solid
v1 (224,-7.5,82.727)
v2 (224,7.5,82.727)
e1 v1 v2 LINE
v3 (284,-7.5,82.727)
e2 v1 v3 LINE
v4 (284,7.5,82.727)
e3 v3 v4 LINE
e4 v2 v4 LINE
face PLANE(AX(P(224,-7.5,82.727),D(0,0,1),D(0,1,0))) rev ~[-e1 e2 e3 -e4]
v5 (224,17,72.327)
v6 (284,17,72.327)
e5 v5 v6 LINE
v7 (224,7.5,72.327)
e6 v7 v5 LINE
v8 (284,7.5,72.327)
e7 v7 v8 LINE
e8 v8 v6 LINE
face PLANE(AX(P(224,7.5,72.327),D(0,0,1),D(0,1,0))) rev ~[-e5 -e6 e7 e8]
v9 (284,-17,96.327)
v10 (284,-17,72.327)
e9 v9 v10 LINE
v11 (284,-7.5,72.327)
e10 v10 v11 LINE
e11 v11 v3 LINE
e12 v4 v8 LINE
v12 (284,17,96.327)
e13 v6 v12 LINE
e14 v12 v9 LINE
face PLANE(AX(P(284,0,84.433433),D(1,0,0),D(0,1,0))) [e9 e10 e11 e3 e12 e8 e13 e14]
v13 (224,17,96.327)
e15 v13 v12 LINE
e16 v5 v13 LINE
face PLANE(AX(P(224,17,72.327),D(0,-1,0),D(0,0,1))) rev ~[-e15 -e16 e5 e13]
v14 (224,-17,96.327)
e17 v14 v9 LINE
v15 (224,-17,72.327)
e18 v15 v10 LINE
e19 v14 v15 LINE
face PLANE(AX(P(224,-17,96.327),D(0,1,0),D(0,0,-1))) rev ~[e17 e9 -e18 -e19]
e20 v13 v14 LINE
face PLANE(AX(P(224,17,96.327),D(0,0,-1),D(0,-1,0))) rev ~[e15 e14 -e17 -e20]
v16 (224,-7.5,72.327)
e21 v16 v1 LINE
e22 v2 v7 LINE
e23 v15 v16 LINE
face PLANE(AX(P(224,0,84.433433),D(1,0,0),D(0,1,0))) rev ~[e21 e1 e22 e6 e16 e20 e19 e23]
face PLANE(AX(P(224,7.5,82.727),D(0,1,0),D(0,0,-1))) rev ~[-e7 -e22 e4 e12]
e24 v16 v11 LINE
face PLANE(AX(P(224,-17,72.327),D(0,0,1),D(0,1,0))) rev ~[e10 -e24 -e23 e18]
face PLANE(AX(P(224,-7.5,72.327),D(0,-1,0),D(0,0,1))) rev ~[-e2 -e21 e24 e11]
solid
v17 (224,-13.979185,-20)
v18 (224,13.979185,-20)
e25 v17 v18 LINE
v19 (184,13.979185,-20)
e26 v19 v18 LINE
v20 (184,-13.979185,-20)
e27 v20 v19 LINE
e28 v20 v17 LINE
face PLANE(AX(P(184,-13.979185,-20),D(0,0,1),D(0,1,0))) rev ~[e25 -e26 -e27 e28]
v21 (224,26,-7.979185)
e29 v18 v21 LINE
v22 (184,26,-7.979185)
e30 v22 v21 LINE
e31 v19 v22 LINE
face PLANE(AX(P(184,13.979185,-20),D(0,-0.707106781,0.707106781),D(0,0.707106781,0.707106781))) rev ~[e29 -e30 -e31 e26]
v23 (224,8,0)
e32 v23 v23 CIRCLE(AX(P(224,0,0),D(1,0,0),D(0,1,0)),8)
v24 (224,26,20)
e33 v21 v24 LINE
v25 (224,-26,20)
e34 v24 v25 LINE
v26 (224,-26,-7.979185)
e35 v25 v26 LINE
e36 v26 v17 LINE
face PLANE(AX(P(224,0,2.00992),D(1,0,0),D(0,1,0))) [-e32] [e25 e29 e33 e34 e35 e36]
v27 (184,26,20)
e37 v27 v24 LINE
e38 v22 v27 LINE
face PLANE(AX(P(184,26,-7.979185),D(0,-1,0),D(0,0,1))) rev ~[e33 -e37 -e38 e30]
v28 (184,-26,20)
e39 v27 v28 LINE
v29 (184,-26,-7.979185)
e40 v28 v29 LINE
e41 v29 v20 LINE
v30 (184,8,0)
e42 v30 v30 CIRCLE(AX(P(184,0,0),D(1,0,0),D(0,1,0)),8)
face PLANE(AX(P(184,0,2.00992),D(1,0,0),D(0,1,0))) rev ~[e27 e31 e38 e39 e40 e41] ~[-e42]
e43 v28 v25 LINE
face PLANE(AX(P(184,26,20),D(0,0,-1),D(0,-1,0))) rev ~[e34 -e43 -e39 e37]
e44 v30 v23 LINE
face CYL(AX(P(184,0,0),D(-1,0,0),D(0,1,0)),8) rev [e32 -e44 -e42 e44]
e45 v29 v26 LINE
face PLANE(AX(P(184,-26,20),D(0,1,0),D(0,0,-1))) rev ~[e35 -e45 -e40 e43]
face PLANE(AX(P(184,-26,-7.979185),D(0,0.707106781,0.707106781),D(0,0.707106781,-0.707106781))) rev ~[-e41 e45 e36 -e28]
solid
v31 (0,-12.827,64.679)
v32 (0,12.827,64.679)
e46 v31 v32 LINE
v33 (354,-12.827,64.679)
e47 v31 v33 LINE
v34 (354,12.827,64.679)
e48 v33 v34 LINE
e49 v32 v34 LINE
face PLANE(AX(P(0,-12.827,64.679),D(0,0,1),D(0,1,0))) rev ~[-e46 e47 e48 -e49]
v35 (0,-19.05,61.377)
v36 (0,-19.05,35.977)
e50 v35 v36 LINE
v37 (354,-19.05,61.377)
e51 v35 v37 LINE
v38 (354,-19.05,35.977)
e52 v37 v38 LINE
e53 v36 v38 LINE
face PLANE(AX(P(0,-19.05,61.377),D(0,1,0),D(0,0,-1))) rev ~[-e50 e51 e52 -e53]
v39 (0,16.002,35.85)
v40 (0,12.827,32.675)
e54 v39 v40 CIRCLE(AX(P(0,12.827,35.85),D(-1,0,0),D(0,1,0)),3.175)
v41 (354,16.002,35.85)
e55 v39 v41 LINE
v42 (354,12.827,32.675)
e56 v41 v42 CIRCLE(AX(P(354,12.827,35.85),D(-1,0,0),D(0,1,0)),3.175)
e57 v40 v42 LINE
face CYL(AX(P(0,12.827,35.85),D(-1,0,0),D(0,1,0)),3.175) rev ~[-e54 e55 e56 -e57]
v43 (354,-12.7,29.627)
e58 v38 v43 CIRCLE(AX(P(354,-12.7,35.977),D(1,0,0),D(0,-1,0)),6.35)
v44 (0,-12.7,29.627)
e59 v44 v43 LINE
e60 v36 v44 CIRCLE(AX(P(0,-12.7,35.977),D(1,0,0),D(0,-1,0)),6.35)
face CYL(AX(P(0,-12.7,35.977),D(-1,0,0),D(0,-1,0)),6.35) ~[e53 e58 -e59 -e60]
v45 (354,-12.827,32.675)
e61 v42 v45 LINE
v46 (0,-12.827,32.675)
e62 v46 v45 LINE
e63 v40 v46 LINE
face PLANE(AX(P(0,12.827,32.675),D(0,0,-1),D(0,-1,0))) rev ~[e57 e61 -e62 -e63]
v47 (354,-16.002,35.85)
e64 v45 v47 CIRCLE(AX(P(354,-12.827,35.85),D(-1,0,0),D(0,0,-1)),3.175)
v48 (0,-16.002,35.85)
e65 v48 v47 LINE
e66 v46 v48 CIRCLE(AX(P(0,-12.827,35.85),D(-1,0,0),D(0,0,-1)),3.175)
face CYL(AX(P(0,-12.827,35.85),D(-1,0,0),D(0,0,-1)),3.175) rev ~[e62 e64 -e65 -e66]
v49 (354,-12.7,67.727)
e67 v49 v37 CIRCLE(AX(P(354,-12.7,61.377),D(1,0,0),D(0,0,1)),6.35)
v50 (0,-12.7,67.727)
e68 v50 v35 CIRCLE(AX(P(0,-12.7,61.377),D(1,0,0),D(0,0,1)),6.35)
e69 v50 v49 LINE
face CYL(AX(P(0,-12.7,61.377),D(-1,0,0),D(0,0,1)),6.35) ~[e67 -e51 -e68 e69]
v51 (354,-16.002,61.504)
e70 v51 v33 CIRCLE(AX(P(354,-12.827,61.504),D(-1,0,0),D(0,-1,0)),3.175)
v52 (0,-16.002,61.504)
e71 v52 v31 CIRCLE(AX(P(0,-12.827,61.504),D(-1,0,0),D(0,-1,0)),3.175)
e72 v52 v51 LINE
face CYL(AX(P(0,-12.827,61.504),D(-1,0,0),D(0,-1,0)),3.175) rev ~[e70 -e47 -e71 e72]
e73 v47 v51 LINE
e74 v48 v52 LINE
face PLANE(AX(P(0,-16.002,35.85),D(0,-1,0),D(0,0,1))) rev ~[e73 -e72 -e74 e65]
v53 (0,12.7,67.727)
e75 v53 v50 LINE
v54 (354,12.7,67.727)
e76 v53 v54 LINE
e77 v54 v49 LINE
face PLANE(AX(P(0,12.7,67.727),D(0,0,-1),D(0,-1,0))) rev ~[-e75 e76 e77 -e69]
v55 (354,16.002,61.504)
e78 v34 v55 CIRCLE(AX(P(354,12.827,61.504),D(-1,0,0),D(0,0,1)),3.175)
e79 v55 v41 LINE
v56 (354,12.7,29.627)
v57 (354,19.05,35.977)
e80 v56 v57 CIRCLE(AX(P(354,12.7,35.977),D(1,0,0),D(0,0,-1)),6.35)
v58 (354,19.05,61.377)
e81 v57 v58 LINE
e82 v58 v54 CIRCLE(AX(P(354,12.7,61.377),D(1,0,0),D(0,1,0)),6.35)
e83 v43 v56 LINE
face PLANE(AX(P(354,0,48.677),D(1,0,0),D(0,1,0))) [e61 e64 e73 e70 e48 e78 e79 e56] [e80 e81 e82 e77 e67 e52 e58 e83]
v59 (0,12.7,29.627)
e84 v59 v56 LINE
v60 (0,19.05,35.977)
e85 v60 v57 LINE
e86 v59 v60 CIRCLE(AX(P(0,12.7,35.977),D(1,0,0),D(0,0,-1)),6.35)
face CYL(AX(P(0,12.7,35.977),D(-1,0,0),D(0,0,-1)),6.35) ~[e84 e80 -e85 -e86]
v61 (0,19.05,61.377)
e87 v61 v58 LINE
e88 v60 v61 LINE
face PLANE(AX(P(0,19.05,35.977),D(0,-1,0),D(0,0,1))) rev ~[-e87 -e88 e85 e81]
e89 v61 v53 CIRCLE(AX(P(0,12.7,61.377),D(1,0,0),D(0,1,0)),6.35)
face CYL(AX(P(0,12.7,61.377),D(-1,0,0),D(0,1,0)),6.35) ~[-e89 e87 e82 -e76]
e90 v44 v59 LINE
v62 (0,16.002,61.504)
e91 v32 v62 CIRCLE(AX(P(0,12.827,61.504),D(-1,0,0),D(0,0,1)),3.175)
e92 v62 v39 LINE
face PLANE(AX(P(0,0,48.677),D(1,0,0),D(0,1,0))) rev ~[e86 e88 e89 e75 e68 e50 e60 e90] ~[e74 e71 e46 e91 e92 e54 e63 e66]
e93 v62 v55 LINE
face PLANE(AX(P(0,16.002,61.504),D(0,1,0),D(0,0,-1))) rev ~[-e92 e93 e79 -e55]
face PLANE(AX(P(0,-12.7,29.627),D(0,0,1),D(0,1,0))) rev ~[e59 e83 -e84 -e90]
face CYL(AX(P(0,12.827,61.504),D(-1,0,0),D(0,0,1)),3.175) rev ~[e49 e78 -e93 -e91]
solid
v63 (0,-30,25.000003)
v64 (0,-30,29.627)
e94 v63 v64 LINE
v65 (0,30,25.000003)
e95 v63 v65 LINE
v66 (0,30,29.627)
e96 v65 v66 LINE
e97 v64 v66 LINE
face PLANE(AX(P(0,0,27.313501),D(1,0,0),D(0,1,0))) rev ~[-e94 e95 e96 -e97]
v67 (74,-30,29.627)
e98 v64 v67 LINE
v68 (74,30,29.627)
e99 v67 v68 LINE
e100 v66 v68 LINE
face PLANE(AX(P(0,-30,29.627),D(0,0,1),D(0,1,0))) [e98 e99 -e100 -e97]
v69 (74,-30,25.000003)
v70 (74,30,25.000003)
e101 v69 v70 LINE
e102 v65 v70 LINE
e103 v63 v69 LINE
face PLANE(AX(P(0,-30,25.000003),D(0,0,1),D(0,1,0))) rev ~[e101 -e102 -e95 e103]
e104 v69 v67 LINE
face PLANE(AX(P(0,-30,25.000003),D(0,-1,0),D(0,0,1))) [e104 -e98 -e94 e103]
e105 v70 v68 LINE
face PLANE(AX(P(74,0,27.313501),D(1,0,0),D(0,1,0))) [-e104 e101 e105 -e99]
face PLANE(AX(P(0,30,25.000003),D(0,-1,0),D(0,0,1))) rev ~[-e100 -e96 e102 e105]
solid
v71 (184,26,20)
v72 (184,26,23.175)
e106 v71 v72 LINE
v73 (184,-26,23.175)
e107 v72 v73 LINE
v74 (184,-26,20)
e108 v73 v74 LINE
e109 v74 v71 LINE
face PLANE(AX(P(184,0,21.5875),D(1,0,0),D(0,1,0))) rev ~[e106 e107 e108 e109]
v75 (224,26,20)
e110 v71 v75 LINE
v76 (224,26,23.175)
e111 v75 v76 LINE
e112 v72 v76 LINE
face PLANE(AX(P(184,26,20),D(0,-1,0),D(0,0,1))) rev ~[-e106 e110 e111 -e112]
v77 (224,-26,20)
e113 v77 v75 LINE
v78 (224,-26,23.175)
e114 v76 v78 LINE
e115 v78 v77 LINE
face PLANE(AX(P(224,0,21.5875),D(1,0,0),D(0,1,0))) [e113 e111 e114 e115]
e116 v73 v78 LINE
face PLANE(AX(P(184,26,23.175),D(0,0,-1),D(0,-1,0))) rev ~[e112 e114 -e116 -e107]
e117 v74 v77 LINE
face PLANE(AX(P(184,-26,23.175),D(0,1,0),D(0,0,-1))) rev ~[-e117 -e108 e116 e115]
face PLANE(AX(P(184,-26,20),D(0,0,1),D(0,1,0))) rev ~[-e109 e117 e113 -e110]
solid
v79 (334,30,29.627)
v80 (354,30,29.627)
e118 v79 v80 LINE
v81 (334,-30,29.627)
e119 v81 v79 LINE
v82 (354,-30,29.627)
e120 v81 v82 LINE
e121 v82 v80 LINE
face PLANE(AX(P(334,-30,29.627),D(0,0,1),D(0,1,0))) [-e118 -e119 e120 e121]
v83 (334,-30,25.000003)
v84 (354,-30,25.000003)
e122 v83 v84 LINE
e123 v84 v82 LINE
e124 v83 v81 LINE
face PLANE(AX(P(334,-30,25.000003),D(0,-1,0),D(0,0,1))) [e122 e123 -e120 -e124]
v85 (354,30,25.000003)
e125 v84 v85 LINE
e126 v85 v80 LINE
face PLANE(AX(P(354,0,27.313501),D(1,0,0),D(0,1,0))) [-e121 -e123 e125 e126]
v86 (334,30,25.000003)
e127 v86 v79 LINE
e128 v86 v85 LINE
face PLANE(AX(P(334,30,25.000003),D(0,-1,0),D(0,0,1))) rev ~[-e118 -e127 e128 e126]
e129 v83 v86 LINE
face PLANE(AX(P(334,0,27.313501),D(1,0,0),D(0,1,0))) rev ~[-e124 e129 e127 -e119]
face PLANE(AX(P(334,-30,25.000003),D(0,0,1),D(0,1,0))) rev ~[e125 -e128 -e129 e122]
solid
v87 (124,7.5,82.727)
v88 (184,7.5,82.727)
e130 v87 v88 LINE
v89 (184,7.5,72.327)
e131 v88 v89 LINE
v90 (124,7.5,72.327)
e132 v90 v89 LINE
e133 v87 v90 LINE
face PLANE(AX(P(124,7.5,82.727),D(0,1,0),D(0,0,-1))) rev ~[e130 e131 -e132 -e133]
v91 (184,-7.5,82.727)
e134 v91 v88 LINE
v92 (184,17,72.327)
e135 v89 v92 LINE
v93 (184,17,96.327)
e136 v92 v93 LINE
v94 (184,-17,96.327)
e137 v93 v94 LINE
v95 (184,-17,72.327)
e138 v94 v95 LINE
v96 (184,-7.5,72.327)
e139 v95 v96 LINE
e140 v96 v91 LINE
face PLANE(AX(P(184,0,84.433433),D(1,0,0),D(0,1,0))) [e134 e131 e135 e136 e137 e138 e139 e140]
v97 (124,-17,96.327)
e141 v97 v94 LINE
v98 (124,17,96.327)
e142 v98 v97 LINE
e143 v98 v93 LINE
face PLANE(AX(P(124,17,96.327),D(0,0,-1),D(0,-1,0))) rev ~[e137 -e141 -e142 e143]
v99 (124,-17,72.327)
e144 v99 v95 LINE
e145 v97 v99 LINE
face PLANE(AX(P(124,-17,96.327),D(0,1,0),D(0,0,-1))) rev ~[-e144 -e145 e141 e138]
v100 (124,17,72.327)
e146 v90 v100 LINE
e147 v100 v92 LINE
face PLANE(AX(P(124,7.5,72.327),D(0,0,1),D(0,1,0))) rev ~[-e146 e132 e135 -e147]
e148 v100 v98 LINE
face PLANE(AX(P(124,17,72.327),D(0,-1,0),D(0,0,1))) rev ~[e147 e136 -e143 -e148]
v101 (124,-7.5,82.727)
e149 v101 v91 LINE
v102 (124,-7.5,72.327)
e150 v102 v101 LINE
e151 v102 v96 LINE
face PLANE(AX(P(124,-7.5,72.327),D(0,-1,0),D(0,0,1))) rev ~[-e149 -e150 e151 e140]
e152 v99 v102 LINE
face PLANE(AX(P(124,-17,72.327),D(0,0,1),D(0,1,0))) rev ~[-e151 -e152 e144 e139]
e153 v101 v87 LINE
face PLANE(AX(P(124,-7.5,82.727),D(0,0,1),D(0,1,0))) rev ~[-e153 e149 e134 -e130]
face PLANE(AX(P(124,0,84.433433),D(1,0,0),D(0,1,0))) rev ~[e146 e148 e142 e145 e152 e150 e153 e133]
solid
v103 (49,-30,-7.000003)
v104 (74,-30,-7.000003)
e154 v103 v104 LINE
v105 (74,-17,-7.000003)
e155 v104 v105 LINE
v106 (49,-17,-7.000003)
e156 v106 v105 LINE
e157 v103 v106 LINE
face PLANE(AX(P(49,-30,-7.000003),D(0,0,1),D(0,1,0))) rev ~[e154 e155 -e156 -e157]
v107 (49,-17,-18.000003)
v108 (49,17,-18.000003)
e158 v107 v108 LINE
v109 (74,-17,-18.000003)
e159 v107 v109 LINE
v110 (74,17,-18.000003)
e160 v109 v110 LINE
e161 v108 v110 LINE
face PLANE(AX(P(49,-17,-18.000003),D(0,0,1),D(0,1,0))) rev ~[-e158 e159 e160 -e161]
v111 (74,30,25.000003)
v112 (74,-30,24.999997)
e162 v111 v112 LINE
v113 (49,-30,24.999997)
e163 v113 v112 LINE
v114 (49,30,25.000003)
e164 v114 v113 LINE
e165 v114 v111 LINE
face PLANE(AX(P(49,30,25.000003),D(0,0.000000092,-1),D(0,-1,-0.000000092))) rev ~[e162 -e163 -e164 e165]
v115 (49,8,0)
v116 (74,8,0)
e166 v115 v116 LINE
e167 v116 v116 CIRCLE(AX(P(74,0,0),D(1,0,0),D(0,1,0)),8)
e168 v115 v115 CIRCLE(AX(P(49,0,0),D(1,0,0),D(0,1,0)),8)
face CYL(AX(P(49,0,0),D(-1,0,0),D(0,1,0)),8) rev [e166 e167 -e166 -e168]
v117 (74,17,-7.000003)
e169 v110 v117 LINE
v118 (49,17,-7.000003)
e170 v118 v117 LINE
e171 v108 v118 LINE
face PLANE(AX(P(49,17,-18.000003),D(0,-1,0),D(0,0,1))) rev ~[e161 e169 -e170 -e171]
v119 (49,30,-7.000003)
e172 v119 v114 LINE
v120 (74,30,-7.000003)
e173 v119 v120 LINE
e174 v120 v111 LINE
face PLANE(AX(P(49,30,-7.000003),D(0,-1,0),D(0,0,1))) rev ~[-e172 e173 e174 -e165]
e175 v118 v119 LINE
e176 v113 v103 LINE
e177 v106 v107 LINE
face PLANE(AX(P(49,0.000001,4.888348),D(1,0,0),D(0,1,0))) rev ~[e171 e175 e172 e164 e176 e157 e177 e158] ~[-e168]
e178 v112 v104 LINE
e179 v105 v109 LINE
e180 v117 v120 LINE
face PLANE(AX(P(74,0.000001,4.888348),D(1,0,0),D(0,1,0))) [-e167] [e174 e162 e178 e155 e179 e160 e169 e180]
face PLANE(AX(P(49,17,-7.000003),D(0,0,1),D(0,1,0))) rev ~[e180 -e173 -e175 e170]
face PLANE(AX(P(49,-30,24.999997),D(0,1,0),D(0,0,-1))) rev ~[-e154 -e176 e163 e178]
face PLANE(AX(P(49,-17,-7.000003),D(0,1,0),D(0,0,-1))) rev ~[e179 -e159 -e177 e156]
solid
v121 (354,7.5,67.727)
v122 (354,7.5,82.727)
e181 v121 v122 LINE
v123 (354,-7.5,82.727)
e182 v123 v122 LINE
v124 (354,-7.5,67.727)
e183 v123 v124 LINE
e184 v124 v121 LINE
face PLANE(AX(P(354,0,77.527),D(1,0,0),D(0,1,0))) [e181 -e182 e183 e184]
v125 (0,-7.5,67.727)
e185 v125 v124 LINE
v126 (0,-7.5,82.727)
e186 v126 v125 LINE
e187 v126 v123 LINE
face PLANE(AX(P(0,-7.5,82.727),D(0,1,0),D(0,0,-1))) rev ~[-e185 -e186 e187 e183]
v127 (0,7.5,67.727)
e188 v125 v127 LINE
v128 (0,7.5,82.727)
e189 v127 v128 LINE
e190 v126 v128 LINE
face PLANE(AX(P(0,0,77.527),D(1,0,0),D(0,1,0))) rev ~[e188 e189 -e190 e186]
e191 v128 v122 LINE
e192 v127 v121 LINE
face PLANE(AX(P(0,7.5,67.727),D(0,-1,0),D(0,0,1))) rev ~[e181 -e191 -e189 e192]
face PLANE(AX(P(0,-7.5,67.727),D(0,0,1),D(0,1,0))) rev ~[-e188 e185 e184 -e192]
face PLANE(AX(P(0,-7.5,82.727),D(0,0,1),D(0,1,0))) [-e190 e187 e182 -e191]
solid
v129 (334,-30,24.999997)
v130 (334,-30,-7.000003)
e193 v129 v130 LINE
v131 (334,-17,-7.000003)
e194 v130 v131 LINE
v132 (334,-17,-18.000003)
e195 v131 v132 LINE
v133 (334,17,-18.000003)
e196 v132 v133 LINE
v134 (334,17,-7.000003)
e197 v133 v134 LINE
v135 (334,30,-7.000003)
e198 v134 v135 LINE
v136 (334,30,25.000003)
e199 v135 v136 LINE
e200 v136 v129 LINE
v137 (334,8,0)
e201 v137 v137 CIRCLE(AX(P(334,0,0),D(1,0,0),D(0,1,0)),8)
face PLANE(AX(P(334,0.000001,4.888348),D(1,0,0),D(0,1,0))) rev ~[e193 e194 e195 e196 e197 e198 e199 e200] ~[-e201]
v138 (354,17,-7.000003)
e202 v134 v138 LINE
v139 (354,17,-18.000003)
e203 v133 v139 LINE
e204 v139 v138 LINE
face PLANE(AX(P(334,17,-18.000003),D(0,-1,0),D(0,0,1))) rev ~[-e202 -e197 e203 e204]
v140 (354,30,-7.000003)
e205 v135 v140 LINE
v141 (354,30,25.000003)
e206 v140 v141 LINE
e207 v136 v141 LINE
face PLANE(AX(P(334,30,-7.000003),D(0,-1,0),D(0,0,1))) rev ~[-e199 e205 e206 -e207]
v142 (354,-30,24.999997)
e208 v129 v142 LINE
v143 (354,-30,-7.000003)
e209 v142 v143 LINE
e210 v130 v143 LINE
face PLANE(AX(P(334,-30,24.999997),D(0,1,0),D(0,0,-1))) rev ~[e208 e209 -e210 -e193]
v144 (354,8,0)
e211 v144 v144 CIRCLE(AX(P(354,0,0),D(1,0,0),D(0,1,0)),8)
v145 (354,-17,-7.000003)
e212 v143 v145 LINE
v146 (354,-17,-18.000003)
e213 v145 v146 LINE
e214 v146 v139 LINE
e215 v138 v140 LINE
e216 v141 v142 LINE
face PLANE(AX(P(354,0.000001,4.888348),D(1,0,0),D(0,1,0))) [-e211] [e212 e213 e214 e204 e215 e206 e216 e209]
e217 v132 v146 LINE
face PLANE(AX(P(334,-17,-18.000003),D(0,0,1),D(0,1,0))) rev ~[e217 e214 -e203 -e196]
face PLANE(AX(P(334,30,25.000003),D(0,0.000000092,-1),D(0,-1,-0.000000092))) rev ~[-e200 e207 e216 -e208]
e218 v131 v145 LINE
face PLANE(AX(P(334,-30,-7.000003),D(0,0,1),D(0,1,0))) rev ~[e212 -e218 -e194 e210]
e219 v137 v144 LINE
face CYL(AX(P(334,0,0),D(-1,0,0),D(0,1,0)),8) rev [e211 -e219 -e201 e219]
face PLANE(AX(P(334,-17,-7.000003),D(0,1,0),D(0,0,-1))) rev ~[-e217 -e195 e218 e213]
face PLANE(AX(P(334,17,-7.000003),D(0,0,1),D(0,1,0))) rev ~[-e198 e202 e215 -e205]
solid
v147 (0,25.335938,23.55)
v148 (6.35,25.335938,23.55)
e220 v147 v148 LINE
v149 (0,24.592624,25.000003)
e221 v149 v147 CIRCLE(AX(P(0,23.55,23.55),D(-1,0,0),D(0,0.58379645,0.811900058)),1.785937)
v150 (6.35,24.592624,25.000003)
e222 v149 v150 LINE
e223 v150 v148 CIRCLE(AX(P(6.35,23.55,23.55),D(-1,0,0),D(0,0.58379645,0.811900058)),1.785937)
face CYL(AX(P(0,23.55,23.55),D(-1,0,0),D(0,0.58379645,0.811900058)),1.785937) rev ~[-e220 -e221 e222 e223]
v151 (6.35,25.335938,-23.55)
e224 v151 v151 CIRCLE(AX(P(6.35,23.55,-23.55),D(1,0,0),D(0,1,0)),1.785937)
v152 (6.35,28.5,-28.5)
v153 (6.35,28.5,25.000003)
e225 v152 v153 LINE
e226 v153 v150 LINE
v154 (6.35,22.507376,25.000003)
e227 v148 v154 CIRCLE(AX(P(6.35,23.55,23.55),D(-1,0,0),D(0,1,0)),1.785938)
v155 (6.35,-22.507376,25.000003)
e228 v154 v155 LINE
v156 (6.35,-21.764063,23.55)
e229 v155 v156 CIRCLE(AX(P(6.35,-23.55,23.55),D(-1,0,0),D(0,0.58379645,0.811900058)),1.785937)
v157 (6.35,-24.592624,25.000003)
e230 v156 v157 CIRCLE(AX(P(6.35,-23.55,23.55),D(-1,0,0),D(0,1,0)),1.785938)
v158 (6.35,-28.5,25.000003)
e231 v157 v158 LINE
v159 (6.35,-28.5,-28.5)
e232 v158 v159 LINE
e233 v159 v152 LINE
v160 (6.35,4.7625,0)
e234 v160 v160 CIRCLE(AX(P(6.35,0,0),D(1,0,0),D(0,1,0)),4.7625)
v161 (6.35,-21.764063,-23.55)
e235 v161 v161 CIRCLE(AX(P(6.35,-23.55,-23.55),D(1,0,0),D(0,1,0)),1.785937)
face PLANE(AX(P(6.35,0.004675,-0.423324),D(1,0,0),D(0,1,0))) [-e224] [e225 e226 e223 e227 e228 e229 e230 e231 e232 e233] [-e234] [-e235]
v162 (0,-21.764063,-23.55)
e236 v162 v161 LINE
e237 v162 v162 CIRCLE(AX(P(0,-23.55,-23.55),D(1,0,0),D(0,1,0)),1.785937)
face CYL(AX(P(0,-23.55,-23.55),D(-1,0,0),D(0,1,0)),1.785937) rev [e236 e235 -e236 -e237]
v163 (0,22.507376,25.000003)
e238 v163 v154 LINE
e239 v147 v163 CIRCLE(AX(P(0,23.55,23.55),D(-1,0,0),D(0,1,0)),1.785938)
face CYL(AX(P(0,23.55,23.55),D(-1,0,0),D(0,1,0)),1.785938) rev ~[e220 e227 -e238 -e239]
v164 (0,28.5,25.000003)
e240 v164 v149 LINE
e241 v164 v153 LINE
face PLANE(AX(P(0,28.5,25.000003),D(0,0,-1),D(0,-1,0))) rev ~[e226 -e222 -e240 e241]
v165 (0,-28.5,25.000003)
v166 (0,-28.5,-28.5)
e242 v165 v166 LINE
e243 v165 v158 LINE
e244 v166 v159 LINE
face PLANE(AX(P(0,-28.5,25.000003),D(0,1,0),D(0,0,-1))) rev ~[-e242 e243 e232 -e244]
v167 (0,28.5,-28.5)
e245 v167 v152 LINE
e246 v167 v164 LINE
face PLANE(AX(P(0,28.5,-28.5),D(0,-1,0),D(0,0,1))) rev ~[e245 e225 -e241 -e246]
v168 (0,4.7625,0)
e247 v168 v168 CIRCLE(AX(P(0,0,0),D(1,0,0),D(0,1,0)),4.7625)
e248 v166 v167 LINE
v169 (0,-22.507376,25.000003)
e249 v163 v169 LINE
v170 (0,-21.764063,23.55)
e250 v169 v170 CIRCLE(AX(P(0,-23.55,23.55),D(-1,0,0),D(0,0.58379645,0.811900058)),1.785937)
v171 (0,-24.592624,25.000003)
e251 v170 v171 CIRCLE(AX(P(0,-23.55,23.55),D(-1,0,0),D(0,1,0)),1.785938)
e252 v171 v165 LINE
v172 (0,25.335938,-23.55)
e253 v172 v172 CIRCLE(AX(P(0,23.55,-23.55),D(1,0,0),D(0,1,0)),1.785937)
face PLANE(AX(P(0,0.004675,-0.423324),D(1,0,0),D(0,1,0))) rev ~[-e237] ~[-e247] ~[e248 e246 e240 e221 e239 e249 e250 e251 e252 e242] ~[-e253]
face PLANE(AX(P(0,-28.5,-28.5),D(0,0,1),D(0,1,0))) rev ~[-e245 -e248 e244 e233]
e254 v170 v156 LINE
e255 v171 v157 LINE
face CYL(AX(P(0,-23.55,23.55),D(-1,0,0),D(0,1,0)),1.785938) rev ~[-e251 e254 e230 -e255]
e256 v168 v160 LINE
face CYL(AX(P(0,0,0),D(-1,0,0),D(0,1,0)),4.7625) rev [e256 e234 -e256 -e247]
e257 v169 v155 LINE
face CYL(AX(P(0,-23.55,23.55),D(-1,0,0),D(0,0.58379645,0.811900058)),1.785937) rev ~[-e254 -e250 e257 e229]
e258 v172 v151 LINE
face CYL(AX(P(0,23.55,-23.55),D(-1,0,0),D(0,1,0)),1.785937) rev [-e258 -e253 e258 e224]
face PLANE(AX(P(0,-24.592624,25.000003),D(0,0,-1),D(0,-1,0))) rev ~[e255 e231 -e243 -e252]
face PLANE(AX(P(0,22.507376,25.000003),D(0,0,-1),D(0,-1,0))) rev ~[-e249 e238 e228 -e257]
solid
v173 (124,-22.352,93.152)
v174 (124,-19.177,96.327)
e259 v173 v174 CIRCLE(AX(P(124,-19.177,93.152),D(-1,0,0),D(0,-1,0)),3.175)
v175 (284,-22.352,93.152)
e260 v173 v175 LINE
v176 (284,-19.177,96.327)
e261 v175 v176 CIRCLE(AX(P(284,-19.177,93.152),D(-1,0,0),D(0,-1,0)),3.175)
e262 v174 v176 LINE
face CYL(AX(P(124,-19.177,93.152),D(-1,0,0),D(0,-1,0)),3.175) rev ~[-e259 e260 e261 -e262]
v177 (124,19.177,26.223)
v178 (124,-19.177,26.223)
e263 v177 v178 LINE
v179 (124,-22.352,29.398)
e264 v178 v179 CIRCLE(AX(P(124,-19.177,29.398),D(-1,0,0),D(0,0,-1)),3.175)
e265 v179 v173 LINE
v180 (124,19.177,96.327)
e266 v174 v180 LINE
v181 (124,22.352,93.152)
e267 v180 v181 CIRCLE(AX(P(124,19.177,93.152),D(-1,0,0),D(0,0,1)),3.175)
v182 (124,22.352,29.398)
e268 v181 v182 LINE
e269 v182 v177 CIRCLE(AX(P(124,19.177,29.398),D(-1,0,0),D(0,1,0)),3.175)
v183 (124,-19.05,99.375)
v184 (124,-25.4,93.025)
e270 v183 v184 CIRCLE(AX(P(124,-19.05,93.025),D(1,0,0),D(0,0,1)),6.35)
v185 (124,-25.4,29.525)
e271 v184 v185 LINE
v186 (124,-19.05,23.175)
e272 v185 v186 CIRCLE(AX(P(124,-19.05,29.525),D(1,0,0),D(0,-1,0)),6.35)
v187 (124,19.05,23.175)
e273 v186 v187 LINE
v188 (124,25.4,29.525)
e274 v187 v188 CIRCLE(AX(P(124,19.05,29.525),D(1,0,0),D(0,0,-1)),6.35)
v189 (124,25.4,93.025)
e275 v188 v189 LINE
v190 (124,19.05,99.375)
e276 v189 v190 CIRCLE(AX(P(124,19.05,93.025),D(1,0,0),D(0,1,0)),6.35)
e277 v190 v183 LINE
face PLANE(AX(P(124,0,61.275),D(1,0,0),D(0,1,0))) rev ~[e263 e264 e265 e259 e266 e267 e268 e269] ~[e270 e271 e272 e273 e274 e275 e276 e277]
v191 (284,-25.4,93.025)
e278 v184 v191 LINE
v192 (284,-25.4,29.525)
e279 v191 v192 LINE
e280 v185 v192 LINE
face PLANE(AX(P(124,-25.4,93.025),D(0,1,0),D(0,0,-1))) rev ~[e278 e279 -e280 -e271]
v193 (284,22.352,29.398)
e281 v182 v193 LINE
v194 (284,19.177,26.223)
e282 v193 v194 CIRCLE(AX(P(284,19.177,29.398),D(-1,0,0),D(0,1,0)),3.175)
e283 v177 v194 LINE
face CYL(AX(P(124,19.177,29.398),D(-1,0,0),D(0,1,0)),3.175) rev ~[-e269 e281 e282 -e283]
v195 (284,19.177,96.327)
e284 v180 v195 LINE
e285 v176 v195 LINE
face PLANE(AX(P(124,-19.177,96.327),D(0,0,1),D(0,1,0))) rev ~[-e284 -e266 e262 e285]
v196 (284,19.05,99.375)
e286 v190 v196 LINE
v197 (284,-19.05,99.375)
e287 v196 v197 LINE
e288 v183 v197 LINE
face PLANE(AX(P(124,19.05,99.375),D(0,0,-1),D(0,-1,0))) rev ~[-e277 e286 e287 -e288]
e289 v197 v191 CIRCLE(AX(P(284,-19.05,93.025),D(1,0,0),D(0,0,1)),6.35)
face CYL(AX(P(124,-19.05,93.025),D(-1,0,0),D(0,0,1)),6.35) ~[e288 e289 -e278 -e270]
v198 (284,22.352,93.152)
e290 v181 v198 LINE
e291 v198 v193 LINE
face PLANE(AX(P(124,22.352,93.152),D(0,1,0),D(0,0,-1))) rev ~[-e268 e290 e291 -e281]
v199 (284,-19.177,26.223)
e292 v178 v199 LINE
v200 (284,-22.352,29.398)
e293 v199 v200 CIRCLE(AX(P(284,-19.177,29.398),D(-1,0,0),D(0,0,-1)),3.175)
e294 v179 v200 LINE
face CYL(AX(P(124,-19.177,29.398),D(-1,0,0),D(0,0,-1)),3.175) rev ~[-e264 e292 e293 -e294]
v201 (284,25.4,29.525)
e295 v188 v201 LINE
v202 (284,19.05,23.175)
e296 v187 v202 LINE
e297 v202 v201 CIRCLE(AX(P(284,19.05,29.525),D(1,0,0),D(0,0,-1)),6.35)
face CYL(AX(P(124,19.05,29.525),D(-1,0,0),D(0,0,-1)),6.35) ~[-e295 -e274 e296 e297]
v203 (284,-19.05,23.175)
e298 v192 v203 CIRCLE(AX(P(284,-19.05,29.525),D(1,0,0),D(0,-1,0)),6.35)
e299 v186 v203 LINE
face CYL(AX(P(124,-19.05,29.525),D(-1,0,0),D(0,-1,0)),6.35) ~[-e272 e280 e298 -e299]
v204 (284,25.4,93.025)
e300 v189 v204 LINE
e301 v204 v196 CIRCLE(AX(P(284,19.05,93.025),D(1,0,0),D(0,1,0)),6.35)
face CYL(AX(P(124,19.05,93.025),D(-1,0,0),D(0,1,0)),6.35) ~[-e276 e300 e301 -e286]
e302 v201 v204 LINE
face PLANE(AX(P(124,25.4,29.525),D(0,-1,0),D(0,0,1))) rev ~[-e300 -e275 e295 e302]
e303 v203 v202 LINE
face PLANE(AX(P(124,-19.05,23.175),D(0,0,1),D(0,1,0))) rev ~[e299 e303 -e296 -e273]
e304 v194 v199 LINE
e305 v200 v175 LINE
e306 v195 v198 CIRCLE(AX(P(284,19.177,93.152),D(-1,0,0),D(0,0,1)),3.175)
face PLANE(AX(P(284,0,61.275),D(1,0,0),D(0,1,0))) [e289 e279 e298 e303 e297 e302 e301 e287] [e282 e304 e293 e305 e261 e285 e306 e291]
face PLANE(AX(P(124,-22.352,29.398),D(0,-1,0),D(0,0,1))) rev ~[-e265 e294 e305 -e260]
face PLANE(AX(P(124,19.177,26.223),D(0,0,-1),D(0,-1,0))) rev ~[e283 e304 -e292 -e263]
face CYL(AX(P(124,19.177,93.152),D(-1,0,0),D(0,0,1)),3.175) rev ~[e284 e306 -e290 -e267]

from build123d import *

# Parameters (mm, degrees)
F5_R      = 1.7859375
F5_R_2    = 4.7625
F7_DEPTH  = 6.35
F8_START  = 49
F4_R      = 8
F8_DEPTH  = 25
F9_START  = 124
F9_DEPTH  = 160
F10_DEPTH = 354
F11_START = 184
F0_R      = 8
F11_DEPTH = 40
F4_W      = 60
F4_H      = 4.6269972401
F12_DEPTH = 74
F13_START = 334
F13_DEPTH = 20
F14_START = 334
F14_DEPTH = 20
F15_START = 184
F15_DEPTH = 40
F2_W      = 15
F2_H      = 10.4
F2_H_2    = 4.6
F16_DEPTH = 354
F17_START = 124
F17_DEPTH = 60
F18_START = 224
F18_DEPTH = 60


# Not quite as in the source:
# - ends of sketch curves that miss each other by under 0.0002 mm in the source are joined


with BuildPart() as f7:
    # F5 (on Right) → F7 (new body, through all)
    with BuildSketch(Plane.YZ):
        with BuildLine():
            ThreePointArc((-22.5073760265, 25.0000027599), (-21.9607180856, 24.3647120661), (-21.7640625, 23.55))
            ThreePointArc((-21.7640625, 23.55), (-24.3647120661, 21.9607180856), (-24.5926239735, 25.0000027599))
            Line((-24.5926239735, 25.0000027599), (-28.5, 25.0000027599))
            Line((-28.5, 25.0000027599), (-28.5, -28.5))
            Line((-28.5, -28.5), (28.5, -28.5))
            Line((28.5, -28.5), (28.5, 25.0000027599))
            Line((28.5, 25.0000027599), (24.5926239735, 25.0000027599))
            ThreePointArc((24.5926239735, 25.0000027599), (25.1392819144, 24.3647120661), (25.3359375, 23.55))
            ThreePointArc((25.3359375, 23.55), (22.7352879339, 21.9607180856), (22.5073760265, 25.0000027599))
            Line((22.5073760265, 25.0000027599), (-22.5073760265, 25.0000027599))
        make_face()
        with Locations((-23.55, -23.55)):
            Circle(F5_R, mode=Mode.SUBTRACT)
        with Locations((23.55, -23.55)):
            Circle(F5_R, mode=Mode.SUBTRACT)
        Circle(F5_R_2, mode=Mode.SUBTRACT)
    extrude(amount=F7_DEPTH)


with BuildPart() as f8:
    # F4 (on Right) → F8 (new body)
    with BuildSketch(Plane.YZ.offset(F8_START)):
        Polygon((30, 25.0000027599), (-30, 24.9999972401), (-30, -7.0000027599), (-17, -7.0000027599), (-17, -18.0000027599), (17, -18.0000027599), (17, -7.0000027599), (30, -7.0000027599), align=None)
        Circle(F4_R, mode=Mode.SUBTRACT)
    extrude(amount=F8_DEPTH)


with BuildPart() as f9:
    # F1 (on Right) → F9 (new body)
    with BuildSketch(Plane.YZ.offset(F9_START)):
        with BuildLine():
            ThreePointArc((25.4, 93.025), (23.5401280605, 97.5151280605), (19.05, 99.375))
            Line((19.05, 99.375), (-19.05, 99.375))
            ThreePointArc((-19.05, 99.375), (-23.5401280605, 97.5151280605), (-25.4, 93.025))
            Line((-25.4, 93.025), (-25.4, 29.525))
            ThreePointArc((-25.4, 29.525), (-23.5401280605, 25.0348719395), (-19.05, 23.175))
            Line((-19.05, 23.175), (19.05, 23.175))
            ThreePointArc((19.05, 23.175), (23.5401280605, 25.0348719395), (25.4, 29.525))
            Line((25.4, 29.525), (25.4, 93.025))
        make_face()
        with BuildLine():
            Line((-19.177, 96.327), (19.177, 96.327))
            ThreePointArc((19.177, 96.327), (21.4220640303, 95.3970640303), (22.352, 93.152))
            Line((22.352, 93.152), (22.352, 29.398))
            ThreePointArc((22.352, 29.398), (21.4220640303, 27.1529359697), (19.177, 26.223))
            Line((19.177, 26.223), (-19.177, 26.223))
            ThreePointArc((-19.177, 26.223), (-21.4220640303, 27.1529359697), (-22.352, 29.398))
            Line((-22.352, 29.398), (-22.352, 93.152))
            ThreePointArc((-22.352, 93.152), (-21.4220640303, 95.3970640303), (-19.177, 96.327))
        make_face(mode=Mode.SUBTRACT)
    extrude(amount=F9_DEPTH)


with BuildPart() as f10:
    # F3 (on Right) → F10 (new body, through all)
    with BuildSketch(Plane.YZ):
        with BuildLine():
            ThreePointArc((19.05, 61.377), (17.1901280605, 65.8671280605), (12.7, 67.727))
            Line((12.7, 67.727), (-12.7, 67.727))
            ThreePointArc((-12.7, 67.727), (-17.1901280605, 65.8671280605), (-19.05, 61.377))
            Line((-19.05, 61.377), (-19.05, 35.977))
            ThreePointArc((-19.05, 35.977), (-17.1901280605, 31.4868719395), (-12.7, 29.627))
            Line((-12.7, 29.627), (12.7, 29.627))
            ThreePointArc((12.7, 29.627), (17.1901280605, 31.4868719395), (19.05, 35.977))
            Line((19.05, 35.977), (19.05, 61.377))
        make_face()
        with BuildLine():
            Line((-12.827, 64.679), (12.827, 64.679))
            ThreePointArc((12.827, 64.679), (15.0720640303, 63.7490640303), (16.002, 61.504))
            Line((16.002, 61.504), (16.002, 35.85))
            ThreePointArc((16.002, 35.85), (15.0720640303, 33.6049359697), (12.827, 32.675))
            Line((12.827, 32.675), (-12.827, 32.675))
            ThreePointArc((-12.827, 32.675), (-15.0720640303, 33.6049359697), (-16.002, 35.85))
            Line((-16.002, 35.85), (-16.002, 61.504))
            ThreePointArc((-16.002, 61.504), (-15.0720640303, 63.7490640303), (-12.827, 64.679))
        make_face(mode=Mode.SUBTRACT)
    extrude(amount=F10_DEPTH)


with BuildPart() as f11:
    # F0 (on Right) → F11 (new body)
    with BuildSketch(Plane.YZ.offset(F11_START)):
        Polygon((26, 20), (-26, 20), (-26, -7.9791847198), (-13.9791847198, -20), (13.9791847198, -20), (26, -7.9791847198), align=None)
        Circle(F0_R, mode=Mode.SUBTRACT)
    extrude(amount=F11_DEPTH)


with BuildPart() as f12:
    # F4 (on Right) → F12 (new body, through all)
    with BuildSketch(Plane.YZ):
        with Locations((0, 27.31350138)):
            Rectangle(F4_W, F4_H)
    extrude(amount=F12_DEPTH)


with BuildPart() as f13:
    # F4 (on Right) → F13 (new body)
    with BuildSketch(Plane.YZ.offset(F13_START)):
        Polygon((30, 25.0000027599), (-30, 24.9999972401), (-30, -7.0000027599), (-17, -7.0000027599), (-17, -18.0000027599), (17, -18.0000027599), (17, -7.0000027599), (30, -7.0000027599), align=None)
        Circle(F4_R, mode=Mode.SUBTRACT)
    extrude(amount=F13_DEPTH)


with BuildPart() as f14:
    # F4 (on Right) → F14 (new body)
    with BuildSketch(Plane.YZ.offset(F14_START)):
        with Locations((0, 27.31350138)):
            Rectangle(F4_W, F4_H)
    extrude(amount=F14_DEPTH)


with BuildPart() as f15:
    # F1 (on Right) → F15 (new body)
    with BuildSketch(Plane.YZ.offset(F15_START)):
        Polygon((26, 23.175), (19.05, 23.175), (-19.05, 23.175), (-26, 23.175), (-26, 20), (26, 20), align=None)
    extrude(amount=F15_DEPTH)


with BuildPart() as f16:
    # F2 (on Right) → F16 (new body, through all)
    with BuildSketch(Plane.YZ):
        with Locations((0, 77.527)):
            Rectangle(F2_W, F2_H)
        with Locations((0, 70.027)):
            Rectangle(F2_W, F2_H_2)
    extrude(amount=F16_DEPTH)


with BuildPart() as f17:
    # F2 (on Right) → F17 (new body)
    with BuildSketch(Plane.YZ.offset(F17_START)):
        Polygon((7.5, 82.727), (7.5, 72.327), (17, 72.327), (17, 96.327), (-17, 96.327), (-17, 72.327), (-7.5, 72.327), (-7.5, 82.727), align=None)
    extrude(amount=F17_DEPTH)


with BuildPart() as f18:
    # F2 (on Right) → F18 (new body)
    with BuildSketch(Plane.YZ.offset(F18_START)):
        Polygon((7.5, 82.727), (7.5, 72.327), (17, 72.327), (17, 96.327), (-17, 96.327), (-17, 72.327), (-7.5, 72.327), (-7.5, 82.727), align=None)
    extrude(amount=F18_DEPTH)


solid = Compound([f7.part, f8.part, f9.part, f10.part, f11.part, f12.part, f13.part, f14.part, f15.part, f16.part, f17.part, f18.part])
